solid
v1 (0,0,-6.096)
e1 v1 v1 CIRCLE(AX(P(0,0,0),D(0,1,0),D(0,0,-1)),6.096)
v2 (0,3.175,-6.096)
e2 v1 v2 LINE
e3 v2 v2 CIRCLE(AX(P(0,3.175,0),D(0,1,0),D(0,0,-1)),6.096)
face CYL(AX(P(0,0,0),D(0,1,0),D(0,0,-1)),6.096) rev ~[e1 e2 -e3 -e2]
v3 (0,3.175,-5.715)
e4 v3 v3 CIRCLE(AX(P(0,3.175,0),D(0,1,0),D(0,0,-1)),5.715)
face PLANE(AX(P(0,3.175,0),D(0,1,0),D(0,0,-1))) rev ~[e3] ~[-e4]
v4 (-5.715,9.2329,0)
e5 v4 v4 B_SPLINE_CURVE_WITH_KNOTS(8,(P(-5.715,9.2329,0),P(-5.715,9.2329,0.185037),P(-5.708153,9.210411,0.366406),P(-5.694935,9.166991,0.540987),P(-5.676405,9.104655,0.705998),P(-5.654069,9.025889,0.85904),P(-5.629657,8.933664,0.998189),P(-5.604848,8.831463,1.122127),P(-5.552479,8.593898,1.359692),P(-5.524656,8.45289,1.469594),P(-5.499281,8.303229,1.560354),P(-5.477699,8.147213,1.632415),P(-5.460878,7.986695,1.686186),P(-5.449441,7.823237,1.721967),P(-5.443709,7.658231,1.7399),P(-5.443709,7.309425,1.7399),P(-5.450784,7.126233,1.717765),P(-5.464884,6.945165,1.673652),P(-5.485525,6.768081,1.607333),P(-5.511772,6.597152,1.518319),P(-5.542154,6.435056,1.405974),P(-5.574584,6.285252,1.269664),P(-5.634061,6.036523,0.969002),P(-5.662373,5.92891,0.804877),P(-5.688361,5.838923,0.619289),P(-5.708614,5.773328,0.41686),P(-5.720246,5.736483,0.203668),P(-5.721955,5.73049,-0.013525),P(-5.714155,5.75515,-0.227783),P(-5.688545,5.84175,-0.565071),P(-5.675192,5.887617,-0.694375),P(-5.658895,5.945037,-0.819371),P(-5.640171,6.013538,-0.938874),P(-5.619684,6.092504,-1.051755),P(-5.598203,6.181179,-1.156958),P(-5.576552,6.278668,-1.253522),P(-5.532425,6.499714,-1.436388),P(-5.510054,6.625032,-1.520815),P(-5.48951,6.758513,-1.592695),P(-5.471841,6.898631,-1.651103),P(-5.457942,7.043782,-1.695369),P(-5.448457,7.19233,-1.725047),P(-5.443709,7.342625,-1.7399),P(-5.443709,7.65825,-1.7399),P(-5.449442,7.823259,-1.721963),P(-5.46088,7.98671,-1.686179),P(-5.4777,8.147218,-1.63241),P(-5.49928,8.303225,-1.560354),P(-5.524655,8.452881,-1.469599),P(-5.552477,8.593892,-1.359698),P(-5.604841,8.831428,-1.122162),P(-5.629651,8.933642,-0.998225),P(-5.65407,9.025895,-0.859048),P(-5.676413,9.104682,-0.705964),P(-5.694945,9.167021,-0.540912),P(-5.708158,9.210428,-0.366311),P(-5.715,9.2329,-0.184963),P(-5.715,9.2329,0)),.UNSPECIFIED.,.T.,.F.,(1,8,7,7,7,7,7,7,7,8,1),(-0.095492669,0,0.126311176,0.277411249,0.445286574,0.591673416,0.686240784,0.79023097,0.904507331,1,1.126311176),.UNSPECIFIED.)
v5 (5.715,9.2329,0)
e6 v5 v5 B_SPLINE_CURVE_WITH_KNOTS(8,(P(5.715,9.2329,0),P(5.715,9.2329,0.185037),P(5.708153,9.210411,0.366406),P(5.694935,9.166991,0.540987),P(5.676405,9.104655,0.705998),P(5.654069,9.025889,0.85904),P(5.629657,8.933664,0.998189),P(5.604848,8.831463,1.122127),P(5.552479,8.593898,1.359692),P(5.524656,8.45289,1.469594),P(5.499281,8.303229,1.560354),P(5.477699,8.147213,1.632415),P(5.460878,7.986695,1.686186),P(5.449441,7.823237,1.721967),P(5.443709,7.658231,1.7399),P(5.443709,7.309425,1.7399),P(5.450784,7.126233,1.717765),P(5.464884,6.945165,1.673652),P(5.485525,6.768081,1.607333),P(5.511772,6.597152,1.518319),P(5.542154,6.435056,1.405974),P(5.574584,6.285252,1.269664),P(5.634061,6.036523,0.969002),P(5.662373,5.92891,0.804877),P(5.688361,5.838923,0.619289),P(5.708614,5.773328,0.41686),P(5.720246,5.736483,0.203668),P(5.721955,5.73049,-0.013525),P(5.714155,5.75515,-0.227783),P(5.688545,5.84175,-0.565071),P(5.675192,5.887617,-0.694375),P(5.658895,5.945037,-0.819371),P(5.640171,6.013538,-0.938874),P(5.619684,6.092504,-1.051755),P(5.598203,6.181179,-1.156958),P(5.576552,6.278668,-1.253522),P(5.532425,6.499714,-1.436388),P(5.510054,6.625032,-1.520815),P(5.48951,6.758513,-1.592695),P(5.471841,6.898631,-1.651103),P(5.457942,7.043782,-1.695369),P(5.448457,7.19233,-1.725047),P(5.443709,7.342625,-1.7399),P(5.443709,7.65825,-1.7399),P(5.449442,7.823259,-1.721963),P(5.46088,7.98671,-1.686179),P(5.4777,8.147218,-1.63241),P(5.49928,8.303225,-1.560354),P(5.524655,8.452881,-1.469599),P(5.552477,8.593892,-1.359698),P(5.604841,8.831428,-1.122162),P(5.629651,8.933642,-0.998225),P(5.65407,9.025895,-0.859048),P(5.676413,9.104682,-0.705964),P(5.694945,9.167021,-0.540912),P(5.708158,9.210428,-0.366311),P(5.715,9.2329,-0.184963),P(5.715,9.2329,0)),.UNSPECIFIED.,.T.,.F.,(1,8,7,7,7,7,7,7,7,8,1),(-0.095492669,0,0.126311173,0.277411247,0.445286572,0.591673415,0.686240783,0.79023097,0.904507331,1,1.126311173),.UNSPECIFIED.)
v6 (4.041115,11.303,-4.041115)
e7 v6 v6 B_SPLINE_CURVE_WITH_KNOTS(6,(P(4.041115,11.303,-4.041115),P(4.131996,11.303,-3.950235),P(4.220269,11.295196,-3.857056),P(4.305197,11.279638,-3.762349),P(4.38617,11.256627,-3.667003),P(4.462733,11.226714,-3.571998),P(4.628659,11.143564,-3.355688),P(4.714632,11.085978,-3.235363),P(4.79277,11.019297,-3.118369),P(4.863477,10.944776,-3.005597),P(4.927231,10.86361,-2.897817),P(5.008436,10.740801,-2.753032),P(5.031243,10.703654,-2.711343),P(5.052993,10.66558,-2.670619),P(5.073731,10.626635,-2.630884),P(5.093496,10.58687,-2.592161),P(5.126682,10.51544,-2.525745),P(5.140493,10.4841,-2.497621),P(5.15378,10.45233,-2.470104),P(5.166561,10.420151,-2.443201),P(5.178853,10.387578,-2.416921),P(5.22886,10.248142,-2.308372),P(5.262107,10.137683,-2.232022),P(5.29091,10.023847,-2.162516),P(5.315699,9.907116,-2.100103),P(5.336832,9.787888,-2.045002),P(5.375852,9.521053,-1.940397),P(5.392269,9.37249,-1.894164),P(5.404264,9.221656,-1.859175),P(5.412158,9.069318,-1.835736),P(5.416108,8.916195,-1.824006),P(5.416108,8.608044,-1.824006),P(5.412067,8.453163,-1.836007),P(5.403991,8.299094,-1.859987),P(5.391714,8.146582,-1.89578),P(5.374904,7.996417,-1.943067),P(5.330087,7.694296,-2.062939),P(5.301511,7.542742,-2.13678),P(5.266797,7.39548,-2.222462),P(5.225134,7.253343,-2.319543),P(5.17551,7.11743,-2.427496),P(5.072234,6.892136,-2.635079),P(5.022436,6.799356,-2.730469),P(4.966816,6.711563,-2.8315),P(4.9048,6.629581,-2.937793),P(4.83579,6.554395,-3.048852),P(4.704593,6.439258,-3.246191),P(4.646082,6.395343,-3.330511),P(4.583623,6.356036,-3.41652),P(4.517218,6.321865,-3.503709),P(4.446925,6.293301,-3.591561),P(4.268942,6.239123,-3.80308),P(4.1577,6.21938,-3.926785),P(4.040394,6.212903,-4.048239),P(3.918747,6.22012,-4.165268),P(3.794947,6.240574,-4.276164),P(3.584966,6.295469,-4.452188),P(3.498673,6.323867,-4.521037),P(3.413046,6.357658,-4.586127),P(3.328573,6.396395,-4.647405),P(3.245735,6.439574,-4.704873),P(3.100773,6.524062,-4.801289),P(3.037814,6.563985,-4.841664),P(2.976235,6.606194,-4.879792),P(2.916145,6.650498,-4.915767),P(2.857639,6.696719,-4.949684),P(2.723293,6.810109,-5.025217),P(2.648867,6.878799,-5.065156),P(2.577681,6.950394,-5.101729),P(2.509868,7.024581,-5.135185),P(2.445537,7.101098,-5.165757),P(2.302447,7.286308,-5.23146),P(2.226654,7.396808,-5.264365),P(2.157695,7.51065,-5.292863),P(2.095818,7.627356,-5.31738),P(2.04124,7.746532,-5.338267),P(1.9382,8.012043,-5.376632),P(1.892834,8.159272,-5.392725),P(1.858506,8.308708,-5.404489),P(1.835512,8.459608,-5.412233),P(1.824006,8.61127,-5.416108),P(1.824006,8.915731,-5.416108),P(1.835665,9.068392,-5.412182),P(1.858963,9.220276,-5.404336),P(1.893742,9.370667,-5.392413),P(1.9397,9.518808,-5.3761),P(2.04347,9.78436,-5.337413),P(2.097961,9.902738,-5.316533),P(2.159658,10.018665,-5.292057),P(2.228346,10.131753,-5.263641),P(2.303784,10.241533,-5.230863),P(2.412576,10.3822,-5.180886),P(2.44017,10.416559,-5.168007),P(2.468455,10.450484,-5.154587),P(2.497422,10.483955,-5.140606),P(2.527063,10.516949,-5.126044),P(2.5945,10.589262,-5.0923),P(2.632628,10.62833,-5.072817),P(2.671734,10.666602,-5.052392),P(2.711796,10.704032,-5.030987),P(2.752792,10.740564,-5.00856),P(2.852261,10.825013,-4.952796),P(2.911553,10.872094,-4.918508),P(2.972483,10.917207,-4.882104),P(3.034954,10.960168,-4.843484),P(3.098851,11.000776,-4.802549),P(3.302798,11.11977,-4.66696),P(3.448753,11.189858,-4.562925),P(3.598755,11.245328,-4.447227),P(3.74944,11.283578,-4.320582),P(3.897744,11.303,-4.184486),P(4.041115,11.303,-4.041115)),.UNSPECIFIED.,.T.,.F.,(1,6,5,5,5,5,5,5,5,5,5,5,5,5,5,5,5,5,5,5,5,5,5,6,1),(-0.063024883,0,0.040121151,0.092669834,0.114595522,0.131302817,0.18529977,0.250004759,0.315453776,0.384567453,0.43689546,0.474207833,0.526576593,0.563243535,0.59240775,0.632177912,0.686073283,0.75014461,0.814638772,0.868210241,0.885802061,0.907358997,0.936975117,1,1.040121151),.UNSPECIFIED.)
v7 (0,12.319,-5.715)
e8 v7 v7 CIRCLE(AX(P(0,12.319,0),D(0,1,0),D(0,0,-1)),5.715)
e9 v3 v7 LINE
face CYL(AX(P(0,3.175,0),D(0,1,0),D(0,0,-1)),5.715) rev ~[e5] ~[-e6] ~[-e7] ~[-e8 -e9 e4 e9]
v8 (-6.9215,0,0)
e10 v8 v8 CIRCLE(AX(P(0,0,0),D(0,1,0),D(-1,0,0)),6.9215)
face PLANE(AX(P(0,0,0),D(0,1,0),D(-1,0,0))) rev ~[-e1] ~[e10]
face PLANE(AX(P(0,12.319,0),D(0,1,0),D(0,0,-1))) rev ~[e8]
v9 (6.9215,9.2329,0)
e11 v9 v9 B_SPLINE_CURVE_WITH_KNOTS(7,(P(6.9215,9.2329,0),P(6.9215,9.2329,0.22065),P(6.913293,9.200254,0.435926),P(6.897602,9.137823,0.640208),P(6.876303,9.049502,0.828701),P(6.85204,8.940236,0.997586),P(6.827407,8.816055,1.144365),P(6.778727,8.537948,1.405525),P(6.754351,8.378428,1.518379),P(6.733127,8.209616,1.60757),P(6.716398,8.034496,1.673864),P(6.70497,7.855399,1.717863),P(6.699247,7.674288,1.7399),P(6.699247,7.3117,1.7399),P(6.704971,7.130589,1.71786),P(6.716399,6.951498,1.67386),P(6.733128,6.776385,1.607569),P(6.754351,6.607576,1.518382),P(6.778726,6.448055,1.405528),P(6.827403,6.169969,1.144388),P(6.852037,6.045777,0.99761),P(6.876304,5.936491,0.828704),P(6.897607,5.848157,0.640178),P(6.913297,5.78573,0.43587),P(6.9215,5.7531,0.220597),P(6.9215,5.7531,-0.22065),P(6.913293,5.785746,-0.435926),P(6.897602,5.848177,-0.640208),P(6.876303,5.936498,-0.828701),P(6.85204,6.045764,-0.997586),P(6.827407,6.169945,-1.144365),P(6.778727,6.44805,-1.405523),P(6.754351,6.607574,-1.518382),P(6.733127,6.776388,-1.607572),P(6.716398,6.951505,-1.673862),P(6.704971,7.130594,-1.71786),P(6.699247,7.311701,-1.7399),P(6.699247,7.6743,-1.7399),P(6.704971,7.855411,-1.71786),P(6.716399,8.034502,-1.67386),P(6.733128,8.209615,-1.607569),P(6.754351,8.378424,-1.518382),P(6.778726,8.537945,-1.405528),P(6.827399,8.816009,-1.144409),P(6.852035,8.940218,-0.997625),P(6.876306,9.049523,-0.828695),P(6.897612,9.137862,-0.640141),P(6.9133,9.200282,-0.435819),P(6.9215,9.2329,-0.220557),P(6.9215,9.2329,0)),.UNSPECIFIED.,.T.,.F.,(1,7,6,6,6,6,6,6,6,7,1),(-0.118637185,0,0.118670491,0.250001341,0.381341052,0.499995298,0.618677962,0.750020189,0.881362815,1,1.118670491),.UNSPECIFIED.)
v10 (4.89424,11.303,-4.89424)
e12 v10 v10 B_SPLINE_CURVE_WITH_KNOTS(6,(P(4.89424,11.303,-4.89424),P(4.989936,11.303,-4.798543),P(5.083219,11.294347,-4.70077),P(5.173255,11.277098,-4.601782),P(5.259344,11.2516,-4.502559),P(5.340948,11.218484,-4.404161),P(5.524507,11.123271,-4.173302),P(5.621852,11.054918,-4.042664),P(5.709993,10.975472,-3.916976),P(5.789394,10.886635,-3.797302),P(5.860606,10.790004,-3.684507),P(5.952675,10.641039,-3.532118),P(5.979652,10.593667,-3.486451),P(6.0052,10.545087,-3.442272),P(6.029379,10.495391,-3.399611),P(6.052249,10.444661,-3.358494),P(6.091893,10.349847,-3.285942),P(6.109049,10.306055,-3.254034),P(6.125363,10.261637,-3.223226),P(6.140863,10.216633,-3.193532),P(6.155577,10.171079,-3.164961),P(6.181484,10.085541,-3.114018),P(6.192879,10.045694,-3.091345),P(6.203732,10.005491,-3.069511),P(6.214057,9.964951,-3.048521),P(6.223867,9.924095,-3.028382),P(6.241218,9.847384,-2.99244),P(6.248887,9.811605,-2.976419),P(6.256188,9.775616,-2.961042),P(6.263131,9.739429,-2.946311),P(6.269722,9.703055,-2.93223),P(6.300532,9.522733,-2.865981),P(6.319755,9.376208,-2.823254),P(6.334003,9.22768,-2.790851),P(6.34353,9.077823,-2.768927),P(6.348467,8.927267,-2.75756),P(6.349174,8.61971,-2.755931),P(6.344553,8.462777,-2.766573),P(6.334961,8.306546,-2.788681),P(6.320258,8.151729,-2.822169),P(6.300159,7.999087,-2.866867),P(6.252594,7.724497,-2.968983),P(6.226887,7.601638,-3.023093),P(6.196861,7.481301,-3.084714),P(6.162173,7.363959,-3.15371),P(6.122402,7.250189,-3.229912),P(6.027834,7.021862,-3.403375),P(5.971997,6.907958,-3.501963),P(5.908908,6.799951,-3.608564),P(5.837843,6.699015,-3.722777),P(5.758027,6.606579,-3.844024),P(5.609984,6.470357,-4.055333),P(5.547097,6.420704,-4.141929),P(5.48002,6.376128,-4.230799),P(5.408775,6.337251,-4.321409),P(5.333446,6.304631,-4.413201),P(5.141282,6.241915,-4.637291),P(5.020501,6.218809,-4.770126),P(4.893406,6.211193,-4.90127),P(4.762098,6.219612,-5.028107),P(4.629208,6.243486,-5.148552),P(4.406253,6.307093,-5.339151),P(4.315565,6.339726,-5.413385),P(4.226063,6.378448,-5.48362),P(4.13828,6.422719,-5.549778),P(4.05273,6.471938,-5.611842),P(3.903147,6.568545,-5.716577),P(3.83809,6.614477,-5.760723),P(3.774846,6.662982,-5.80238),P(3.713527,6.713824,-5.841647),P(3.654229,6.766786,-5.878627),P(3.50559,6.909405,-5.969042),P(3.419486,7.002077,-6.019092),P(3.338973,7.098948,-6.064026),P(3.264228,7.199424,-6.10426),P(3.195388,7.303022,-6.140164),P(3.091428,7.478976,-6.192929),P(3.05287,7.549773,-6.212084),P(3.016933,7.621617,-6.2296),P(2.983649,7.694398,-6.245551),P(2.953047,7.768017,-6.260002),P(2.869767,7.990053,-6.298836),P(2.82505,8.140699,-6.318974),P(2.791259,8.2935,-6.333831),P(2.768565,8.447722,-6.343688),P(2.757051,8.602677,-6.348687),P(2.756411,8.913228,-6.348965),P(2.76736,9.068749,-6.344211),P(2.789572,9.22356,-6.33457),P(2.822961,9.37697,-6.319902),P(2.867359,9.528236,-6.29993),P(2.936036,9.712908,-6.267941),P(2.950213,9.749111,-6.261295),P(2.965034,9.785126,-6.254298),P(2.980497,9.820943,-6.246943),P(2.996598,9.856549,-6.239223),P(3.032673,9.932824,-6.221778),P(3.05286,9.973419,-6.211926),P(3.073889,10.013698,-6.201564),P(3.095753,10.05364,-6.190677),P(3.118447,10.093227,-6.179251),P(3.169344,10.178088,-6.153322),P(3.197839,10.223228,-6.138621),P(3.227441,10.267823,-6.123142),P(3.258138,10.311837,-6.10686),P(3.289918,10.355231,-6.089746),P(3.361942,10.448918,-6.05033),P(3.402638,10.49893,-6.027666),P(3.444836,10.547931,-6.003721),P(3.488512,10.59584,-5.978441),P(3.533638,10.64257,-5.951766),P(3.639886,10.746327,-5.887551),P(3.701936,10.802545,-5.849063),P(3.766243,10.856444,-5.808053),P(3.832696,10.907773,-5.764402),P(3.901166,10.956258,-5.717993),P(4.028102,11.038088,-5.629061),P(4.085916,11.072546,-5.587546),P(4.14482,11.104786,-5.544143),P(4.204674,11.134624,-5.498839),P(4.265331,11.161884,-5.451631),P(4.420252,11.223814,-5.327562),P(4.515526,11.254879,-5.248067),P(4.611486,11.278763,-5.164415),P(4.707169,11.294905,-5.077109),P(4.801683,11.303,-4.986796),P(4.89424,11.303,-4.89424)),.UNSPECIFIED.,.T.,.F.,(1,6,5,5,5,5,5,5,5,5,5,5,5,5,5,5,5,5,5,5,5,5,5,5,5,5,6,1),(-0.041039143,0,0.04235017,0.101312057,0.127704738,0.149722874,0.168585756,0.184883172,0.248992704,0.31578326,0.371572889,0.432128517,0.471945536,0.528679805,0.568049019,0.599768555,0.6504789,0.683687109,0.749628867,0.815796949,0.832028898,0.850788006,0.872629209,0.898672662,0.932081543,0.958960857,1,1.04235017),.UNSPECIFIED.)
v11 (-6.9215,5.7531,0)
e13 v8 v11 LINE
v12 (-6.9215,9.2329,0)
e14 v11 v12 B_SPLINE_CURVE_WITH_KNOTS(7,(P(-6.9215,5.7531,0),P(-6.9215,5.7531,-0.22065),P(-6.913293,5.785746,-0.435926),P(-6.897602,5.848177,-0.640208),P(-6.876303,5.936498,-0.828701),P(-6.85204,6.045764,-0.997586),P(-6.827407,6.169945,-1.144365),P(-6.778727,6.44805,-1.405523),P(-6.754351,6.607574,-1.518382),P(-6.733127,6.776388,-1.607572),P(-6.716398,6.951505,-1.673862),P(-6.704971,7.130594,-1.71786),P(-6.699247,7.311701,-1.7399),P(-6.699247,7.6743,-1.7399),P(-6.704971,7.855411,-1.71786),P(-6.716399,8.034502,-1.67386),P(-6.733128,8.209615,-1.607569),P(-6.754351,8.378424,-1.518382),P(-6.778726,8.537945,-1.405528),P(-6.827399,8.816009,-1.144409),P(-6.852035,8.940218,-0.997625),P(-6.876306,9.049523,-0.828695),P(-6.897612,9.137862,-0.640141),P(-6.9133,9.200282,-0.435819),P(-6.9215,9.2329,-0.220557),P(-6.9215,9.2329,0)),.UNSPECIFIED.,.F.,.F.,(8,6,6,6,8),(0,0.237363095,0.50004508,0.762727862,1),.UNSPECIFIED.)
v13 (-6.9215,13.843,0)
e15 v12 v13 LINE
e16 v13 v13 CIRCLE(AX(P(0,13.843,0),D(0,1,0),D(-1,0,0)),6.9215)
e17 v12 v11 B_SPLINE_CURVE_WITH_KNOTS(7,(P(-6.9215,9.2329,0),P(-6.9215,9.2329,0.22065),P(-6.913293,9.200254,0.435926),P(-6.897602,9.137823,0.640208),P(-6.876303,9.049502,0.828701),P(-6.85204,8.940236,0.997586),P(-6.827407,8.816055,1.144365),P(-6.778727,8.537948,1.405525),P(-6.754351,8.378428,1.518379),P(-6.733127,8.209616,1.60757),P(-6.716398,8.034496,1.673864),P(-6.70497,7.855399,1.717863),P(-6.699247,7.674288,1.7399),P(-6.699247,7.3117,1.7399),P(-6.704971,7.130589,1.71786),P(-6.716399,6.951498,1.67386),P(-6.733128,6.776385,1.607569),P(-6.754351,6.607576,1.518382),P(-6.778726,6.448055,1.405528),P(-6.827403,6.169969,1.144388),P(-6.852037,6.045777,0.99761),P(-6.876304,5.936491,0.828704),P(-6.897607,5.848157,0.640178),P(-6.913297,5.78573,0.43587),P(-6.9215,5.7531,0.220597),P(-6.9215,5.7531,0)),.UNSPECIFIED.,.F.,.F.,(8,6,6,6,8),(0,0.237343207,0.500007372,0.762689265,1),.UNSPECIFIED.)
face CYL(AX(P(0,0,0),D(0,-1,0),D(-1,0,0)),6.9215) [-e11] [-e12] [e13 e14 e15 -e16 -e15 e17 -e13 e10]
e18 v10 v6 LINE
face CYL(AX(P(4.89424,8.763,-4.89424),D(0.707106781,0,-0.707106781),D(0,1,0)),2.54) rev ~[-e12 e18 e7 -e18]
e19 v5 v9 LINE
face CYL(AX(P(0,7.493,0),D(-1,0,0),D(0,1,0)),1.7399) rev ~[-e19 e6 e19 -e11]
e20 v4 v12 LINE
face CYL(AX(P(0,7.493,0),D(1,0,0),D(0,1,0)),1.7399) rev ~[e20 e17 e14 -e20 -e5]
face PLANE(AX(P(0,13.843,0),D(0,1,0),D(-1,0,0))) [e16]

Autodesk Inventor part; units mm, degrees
ref_plane "YZ Plane" through (0, 0, 0) normal (1, 0, 0) x (0, 1, 0)
ref_plane "XZ Plane" through (0, 0, 0) normal (0, 1, 0) x (-1, 0, 0)
ref_plane "XY Plane" through (0, 0, 0) normal (0, 0, 1) x (1, 0, 0)
sketch "Sketch1" plane through (0, 0, 0) normal (0, 1, 0) x (-1, 0, 0)
  circle A0 centre (0, 0) radius 6.9215
  dimension "d0" = 13.843
extrude "Extrusion1" add sketch "Sketch1" along normal blind 13.843
hole "Hole2" at (0, 0, 0) direction (0, 1, 0) diameter 12.192 depth 3.175
hole "Hole1" at (0, 3.175, 0) direction (0, 1, 0) diameter 11.43 depth 9.144
sketch "Sketch2" plane through (0, 0, 0) normal (1, 0, 0) x (0, 1, 0)
  line L0 (13.843, -6.9215) -> (13.843, 6.9215) projected
  line L1 (13.843, 0) -> (7.493, 0)
  circle A0 centre (7.493, 0) radius 1.7399
  point P0 (0, 0)
  dimension "d21" = 6.35
  dimension "d22" = 3.4798
extrude "Extrusion2" cut sketch "Sketch2" along normal through all both and the other way through all
sketch "Workplane Control Sketch" plane through (0, 13.843, 0) normal (0, 1, 0) x (1, 0, 0)
  circle A0 centre (0, 0) radius 6.9215
  line L0 (0, 0) -> (4.89424, 4.89424)
  line L1 (0, 0) -> (0, 6.9215) construction
  dimension "d25" = 45
ref_plane "Work Plane1" through (4.89424, 13.843, -4.89424) normal (0.7071068, 0, -0.7071068) x (0, 1, 0)
sketch "Sketch4" plane through (4.89424, 13.843, -4.89424) normal (0.7071068, 0, -0.7071068) x (0, 1, 0)
  line L0 (0, 0) -> (-5.08, 0)
  circle A0 centre (-5.08, 0) radius 2.54
  point P0 (-13.843, 0)
  dimension "d26" = 5.08
  dimension "d27" = 5.08
extrude "Extrusion3" cut sketch "Sketch4" against normal up to next
properties part number "Piston" material "Aluminum 6061"
